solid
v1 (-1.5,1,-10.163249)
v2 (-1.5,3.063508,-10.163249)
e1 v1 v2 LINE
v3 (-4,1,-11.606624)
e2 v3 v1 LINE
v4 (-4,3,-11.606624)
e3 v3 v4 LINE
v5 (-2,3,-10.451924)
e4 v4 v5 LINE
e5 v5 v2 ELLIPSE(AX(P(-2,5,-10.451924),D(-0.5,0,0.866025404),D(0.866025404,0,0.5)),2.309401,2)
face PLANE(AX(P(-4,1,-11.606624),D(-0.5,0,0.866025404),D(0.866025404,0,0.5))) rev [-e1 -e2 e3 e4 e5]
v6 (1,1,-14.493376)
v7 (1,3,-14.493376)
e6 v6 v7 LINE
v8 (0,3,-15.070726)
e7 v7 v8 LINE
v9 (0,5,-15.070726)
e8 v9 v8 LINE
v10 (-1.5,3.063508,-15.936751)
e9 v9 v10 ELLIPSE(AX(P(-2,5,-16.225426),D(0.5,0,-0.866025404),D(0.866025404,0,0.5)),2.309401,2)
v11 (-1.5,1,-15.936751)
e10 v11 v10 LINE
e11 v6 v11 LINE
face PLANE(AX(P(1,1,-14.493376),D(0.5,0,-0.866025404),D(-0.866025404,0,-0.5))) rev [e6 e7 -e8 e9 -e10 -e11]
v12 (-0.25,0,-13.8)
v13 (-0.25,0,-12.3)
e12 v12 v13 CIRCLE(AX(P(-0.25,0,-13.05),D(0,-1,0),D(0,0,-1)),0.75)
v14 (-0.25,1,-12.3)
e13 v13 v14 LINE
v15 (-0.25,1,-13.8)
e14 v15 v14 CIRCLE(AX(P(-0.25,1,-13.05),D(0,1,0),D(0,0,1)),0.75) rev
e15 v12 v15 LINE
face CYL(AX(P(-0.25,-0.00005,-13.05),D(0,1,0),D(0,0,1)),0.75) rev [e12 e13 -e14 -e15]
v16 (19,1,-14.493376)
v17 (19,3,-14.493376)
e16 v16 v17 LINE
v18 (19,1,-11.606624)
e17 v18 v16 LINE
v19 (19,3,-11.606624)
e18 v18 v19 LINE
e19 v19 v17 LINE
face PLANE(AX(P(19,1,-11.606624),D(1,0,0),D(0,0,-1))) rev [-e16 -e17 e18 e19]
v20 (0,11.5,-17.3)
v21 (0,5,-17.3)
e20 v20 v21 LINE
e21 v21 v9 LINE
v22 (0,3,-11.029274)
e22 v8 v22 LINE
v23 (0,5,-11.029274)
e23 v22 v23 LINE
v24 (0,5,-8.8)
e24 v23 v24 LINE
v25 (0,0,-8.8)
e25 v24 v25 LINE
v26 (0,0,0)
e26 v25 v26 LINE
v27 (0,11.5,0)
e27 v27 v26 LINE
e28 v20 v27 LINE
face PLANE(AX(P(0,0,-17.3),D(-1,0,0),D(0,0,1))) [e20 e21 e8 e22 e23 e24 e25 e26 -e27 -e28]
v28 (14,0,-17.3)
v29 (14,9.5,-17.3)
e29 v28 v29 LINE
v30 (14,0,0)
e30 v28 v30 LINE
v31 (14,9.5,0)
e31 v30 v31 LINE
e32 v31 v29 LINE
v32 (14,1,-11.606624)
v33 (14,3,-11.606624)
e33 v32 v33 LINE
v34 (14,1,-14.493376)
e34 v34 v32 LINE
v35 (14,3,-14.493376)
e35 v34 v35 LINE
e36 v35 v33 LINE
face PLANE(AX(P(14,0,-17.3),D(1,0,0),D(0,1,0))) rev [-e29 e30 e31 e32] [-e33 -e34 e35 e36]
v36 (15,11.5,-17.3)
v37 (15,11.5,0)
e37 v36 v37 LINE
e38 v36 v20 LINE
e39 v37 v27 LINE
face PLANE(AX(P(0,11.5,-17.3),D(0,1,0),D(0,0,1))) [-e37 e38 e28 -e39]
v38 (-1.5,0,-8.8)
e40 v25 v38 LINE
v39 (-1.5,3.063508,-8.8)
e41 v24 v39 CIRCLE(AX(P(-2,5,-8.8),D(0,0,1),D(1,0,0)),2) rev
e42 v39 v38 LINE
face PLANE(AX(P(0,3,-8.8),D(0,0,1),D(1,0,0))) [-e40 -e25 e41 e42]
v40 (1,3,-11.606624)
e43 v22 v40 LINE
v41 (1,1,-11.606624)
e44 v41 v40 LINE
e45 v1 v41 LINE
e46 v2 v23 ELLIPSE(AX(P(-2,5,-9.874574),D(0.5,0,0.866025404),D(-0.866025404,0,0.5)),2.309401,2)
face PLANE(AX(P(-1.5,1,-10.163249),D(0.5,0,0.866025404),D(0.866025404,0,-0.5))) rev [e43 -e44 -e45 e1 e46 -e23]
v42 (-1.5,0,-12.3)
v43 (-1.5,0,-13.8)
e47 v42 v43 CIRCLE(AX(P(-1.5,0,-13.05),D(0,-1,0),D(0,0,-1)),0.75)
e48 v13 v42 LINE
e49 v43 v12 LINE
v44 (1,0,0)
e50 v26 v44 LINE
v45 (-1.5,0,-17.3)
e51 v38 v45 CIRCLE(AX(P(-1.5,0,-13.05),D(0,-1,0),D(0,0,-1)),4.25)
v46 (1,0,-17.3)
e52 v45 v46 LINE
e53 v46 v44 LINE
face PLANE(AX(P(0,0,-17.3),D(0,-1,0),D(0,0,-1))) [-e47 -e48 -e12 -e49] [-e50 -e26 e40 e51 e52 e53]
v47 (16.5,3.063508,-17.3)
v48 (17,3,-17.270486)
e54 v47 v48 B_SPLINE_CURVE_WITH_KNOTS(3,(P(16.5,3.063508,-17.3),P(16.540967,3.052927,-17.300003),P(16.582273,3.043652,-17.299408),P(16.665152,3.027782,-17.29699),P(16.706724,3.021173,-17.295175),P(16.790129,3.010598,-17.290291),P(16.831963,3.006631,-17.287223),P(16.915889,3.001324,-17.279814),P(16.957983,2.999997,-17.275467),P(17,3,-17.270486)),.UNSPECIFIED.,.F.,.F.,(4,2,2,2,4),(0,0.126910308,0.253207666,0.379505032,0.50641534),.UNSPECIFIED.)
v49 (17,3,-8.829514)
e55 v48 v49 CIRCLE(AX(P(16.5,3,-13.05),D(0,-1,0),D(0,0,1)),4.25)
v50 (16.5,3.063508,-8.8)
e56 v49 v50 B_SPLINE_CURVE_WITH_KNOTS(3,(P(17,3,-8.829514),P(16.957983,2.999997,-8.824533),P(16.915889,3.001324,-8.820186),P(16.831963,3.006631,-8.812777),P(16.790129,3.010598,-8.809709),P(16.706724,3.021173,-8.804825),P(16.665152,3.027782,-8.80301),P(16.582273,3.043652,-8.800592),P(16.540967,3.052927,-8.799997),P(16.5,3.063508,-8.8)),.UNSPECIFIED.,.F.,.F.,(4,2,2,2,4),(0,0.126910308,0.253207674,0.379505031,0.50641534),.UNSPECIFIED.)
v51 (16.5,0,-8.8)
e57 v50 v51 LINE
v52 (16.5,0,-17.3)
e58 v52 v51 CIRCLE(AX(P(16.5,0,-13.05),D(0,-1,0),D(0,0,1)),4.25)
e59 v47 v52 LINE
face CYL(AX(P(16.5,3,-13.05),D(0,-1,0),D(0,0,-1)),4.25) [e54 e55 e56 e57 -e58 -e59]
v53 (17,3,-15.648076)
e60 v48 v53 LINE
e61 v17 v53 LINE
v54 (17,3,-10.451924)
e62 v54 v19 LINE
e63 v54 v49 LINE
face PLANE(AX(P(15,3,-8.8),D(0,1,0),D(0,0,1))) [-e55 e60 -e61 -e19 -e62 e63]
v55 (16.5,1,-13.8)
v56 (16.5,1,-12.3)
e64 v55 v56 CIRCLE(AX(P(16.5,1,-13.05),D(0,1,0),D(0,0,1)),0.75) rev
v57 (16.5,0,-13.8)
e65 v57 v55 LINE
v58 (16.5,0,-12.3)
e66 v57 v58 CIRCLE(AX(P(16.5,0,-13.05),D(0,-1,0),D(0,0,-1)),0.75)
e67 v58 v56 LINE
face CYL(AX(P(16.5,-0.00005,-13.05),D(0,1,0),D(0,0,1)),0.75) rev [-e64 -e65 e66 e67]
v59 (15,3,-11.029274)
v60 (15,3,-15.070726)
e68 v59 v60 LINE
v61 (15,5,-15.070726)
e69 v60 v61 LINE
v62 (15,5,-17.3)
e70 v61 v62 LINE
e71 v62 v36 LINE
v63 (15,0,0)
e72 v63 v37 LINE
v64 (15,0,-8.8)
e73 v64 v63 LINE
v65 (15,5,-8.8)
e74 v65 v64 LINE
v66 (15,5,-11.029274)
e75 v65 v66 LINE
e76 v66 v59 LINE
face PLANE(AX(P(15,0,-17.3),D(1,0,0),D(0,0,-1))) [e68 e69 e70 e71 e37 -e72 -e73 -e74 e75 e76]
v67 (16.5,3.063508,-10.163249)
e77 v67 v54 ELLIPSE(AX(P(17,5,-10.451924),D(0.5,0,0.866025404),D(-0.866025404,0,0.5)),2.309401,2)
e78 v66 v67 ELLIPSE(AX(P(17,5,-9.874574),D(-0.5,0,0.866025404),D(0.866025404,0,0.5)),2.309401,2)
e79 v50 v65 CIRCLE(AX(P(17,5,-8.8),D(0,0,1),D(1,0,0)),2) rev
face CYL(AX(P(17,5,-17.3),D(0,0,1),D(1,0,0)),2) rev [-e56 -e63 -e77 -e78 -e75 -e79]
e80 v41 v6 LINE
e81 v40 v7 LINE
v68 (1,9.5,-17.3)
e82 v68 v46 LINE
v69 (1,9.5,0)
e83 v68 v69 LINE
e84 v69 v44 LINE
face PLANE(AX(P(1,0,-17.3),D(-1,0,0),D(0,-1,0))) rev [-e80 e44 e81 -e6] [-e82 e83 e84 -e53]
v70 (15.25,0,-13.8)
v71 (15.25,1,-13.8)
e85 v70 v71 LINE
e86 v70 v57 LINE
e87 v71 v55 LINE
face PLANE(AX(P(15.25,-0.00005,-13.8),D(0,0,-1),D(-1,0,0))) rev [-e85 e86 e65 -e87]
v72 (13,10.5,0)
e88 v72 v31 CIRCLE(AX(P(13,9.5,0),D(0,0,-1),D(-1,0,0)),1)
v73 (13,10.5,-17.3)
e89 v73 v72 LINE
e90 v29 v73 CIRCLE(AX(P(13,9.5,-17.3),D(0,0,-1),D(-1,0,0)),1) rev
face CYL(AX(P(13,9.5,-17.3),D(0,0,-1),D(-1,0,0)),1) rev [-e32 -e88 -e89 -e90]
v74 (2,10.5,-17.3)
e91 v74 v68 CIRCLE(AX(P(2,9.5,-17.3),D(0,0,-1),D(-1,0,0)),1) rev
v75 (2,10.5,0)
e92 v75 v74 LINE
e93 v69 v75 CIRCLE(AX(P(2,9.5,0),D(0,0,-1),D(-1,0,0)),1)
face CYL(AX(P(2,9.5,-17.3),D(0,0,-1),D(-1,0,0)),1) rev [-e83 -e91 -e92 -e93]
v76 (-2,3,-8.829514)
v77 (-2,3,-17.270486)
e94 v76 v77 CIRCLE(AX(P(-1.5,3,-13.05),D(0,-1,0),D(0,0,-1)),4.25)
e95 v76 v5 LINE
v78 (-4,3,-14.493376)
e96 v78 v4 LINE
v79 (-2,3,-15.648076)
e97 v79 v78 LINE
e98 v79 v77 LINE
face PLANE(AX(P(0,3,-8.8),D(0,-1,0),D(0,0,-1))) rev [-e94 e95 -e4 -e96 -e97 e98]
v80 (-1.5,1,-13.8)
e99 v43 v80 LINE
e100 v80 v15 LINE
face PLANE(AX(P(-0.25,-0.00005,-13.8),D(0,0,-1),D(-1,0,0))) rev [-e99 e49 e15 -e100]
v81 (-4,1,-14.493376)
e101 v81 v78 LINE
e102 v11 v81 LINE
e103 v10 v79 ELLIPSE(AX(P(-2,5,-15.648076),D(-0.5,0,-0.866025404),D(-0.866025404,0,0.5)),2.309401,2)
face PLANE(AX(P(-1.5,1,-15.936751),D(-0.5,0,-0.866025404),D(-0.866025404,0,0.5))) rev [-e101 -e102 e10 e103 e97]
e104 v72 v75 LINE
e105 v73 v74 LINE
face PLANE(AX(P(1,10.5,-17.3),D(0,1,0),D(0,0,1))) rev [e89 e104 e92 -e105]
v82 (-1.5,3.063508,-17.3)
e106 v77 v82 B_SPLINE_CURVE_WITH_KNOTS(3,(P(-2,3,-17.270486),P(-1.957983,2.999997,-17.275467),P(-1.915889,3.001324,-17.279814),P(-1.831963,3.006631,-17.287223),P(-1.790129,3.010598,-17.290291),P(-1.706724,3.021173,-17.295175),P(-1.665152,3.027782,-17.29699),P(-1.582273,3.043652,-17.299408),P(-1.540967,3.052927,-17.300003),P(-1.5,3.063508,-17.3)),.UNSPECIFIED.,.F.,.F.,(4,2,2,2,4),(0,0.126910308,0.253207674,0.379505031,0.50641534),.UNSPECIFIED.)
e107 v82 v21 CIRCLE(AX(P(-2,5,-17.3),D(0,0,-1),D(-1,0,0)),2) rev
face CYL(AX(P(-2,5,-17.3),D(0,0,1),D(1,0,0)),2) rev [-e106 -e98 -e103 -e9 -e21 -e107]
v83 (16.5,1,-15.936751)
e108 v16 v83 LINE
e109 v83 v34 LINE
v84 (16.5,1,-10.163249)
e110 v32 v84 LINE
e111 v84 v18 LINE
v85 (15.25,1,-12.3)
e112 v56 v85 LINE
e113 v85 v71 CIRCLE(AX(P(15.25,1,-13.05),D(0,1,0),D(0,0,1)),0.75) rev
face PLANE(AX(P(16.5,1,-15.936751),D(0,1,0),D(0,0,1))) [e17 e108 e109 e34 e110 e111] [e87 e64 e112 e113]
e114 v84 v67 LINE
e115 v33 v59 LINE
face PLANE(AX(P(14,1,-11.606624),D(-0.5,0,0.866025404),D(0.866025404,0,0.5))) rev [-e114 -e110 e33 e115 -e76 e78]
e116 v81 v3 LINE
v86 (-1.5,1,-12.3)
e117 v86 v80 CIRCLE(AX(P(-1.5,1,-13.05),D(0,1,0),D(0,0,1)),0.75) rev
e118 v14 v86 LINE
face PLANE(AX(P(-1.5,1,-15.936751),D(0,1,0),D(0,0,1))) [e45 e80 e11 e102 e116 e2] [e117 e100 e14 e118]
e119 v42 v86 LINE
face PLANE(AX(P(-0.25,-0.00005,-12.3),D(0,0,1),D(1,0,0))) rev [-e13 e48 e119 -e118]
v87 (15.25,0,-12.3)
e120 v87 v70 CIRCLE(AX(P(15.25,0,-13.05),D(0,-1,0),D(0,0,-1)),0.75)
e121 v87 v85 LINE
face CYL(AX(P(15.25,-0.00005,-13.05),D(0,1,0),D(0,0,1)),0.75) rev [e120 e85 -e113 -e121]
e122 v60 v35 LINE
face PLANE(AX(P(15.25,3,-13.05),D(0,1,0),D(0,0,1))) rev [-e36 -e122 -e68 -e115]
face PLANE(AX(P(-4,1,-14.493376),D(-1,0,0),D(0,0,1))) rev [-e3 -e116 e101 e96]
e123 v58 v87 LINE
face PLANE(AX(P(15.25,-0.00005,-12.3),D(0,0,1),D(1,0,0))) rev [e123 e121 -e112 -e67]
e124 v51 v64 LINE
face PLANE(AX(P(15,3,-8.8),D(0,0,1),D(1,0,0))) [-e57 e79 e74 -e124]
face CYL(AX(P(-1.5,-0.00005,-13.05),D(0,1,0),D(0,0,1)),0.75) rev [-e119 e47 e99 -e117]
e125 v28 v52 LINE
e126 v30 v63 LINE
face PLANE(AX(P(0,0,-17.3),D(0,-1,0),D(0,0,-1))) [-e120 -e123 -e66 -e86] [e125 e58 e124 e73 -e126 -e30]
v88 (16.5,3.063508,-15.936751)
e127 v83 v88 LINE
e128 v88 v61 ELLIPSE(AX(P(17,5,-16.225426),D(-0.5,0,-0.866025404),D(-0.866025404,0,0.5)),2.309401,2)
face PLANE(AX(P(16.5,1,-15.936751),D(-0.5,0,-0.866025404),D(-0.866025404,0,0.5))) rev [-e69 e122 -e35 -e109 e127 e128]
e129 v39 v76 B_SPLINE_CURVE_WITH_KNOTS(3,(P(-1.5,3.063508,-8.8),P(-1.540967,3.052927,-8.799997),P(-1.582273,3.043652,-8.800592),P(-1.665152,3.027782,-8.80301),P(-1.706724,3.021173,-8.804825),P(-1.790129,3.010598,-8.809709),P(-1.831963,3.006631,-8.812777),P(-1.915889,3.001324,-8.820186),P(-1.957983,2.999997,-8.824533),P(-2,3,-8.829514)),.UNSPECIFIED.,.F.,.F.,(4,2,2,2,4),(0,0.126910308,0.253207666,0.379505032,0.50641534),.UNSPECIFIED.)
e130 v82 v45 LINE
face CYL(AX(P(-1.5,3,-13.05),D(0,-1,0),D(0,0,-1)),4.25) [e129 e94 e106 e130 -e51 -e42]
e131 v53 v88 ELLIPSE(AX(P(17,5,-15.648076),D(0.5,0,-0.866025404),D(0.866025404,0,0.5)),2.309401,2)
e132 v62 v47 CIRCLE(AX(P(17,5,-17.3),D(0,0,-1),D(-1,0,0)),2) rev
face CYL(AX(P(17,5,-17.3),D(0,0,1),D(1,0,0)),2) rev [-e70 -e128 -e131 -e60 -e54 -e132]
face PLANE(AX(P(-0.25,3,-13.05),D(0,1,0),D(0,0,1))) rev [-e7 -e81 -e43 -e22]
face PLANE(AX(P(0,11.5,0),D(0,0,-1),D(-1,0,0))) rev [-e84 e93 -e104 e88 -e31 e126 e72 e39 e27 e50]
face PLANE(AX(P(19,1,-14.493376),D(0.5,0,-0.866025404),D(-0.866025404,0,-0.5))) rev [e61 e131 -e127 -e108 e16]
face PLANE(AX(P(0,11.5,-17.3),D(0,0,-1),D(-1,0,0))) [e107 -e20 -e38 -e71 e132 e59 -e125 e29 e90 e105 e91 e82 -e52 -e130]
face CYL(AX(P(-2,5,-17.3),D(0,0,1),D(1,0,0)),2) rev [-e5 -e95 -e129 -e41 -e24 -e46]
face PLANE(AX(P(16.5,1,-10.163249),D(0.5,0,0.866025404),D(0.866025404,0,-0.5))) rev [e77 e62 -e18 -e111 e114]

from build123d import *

# Parameters (mm, degrees)
SKETCH1_W           = 15
SKETCH1_H           = 11.5
BOSS_EXTRUDE1_DEPTH = 17.3
SKETCH2_W           = 13
SKETCH2_H           = 10.5
CUT_EXTRUDE1_DEPTH  = 26.62303651
FILLET1_R           = 1
SKETCH7_W           = 1.5
SKETCH7_H           = 8.5
BOSS_EXTRUDE4_DEPTH = 3
BOSS_EXTRUDE5_DEPTH = 3
BOSS_EXTRUDE6_DEPTH = 3
CUT_EXTRUDE4_DEPTH  = 29.32141416
CUT_EXTRUDE5_DEPTH  = 2
FILLET6_START       = -16.47329
FILLET6_DEPTH       = 0.536538654
FILLET6_START_2     = -10.163248654
FILLET6_2_DEPTH     = 0.536538654
FILLET6_START_3     = -11.029274158
FILLET6_3_DEPTH     = 2.229274158
FILLET6_START_4     = -17.3
FILLET6_4_DEPTH     = 2.229274058
FILLET6_START_5     = 3
FILLET6_5_DEPTH     = 3


with BuildPart() as part:
    # Sketch1 → Boss-Extrude1 (new body)
    with BuildSketch(Plane.XY):
        with Locations((7.5, 5.75)):
            Rectangle(SKETCH1_W, SKETCH1_H)
    extrude(amount=-BOSS_EXTRUDE1_DEPTH)

    # Sketch2 → Cut-Extrude1 (cut, through all)
    with BuildSketch(Plane.XY):
        with Locations((7.5, 5.25)):
            Rectangle(SKETCH2_W, SKETCH2_H)
    extrude(amount=-CUT_EXTRUDE1_DEPTH, mode=Mode.SUBTRACT)

    # Fillet1
    fillet1_edges = [part.edges().sort_by_distance(p)[0] for p in [
        (1, 10.5, -8.65),
        (14, 10.5, -8.65),
    ]]
    fillet(fillet1_edges, radius=FILLET1_R)

    # Sketch7 → Boss-Extrude4 (add)
    with BuildSketch(Plane.XZ):
        with Locations((-0.75, -13.05)):
            Rectangle(SKETCH7_W, SKETCH7_H)
        with Locations((15.75, -13.05)):
            Rectangle(SKETCH7_W, SKETCH7_H)
    extrude(amount=-BOSS_EXTRUDE4_DEPTH)

    # Sketch11 → Boss-Extrude5 (add)
    with BuildSketch(Plane.XZ):
        with BuildLine():
            Line((-1.5, -8.8), (-1.5, -17.3))
            ThreePointArc((-1.5, -17.3), (-5.75, -13.05), (-1.5, -8.8))
        make_face()
    extrude(amount=-BOSS_EXTRUDE5_DEPTH)

    # Sketch12 → Boss-Extrude6 (add)
    with BuildSketch(Plane.XZ):
        with BuildLine():
            Line((14, 0), (14, -17.3))
            Line((14, -17.3), (16.5, -17.3))
            ThreePointArc((16.5, -17.3), (20.75, -13.05), (16.5, -8.8))
            Line((16.5, -8.8), (15, -8.8))
            Line((15, -8.8), (15, 0))
            Line((15, 0), (14, 0))
        make_face()
    extrude(amount=-BOSS_EXTRUDE6_DEPTH)

    # Sketch13 → Cut-Extrude4 (cut, through all)
    with BuildSketch(Plane(origin=(0, 3, 0), x_dir=(1, 0, 0), z_dir=(0, 1, 0))):
        with BuildLine():
            Line((-0.25, 12.3), (-1.5, 12.3))
            ThreePointArc((-1.5, 12.3), (-2.25, 13.05), (-1.5, 13.8))
            Line((-1.5, 13.8), (-0.25, 13.8))
            ThreePointArc((-0.25, 13.8), (0.5, 13.05), (-0.25, 12.3))
        make_face()
        with BuildLine():
            Line((15.25, 13.8), (16.5, 13.8))
            ThreePointArc((16.5, 13.8), (17.25, 13.05), (16.5, 12.3))
            Line((16.5, 12.3), (15.25, 12.3))
            ThreePointArc((15.25, 12.3), (14.5, 13.05), (15.25, 13.8))
        make_face()
    extrude(amount=-CUT_EXTRUDE4_DEPTH, mode=Mode.SUBTRACT)

    # Sketch14 → Cut-Extrude5 (cut)
    with BuildSketch(Plane(origin=(0, 3, 0), x_dir=(1, 0, 0), z_dir=(0, 1, 0))):
        Polygon((-1.5, 15.936751346), (-4, 14.493375673), (-4, 11.606624327), (-1.5, 10.163248654), (1, 11.606624327), (1, 14.493375673), align=None)
        Polygon((16.5, 15.936751346), (14, 14.493375673), (14, 11.606624327), (16.5, 10.163248654), (19, 11.606624327), (19, 14.493375673), align=None)
    extrude(amount=-CUT_EXTRUDE5_DEPTH, mode=Mode.SUBTRACT)

    # Fillet6: read off the stored shape, not the designer's step
    # Fillet6 outline → Fillet6 (add)
    with BuildSketch(Plane.XY.offset(FILLET6_START)):
        with BuildLine():
            ThreePointArc((17, 3), (15.585786438, 3.585786438), (15, 5))
            Line((15, 5), (15, 3))
            Line((15, 3), (17, 3))
        make_face()
        with BuildLine():
            ThreePointArc((0, 5), (-0.585786438, 3.585786438), (-2, 3))
            Line((-2, 3), (0, 3))
            Line((0, 3), (0, 5))
        make_face()
    extrude(amount=FILLET6_DEPTH)

    # Fillet6 2 outline → Fillet6 2 (add)
    with BuildSketch(Plane.XY.offset(FILLET6_START_2)):
        with BuildLine():
            ThreePointArc((17, 3), (15.585786438, 3.585786438), (15, 5))
            Line((15, 5), (15, 3))
            Line((15, 3), (17, 3))
        make_face()
        with BuildLine():
            ThreePointArc((0, 5), (-0.585786438, 3.585786438), (-2, 3))
            Line((-2, 3), (0, 3))
            Line((0, 3), (0, 5))
        make_face()
    extrude(amount=FILLET6_2_DEPTH)

    # Fillet6 3 outline → Fillet6 3 (add)
    with BuildSketch(Plane.XY.offset(FILLET6_START_3)):
        with BuildLine():
            ThreePointArc((17, 3), (15.585786438, 3.585786438), (15, 5))
            Line((15, 5), (15, 3))
            Line((15, 3), (17, 3))
        make_face()
        with BuildLine():
            ThreePointArc((0, 5), (-0.585786438, 3.585786438), (-2, 3))
            Line((-2, 3), (0, 3))
            Line((0, 3), (0, 5))
        make_face()
    extrude(amount=FILLET6_3_DEPTH)

    # Fillet6 4 outline → Fillet6 4 (add)
    with BuildSketch(Plane.XY.offset(FILLET6_START_4)):
        with BuildLine():
            ThreePointArc((17, 3), (15.585786438, 3.585786438), (15, 5))
            Line((15, 5), (15, 3))
            Line((15, 3), (17, 3))
        make_face()
        with BuildLine():
            ThreePointArc((0, 5), (-0.585786438, 3.585786438), (-2, 3))
            Line((-2, 3), (0, 3))
            Line((0, 3), (0, 5))
        make_face()
    extrude(amount=FILLET6_4_DEPTH)

    # Fillet6 5 outline → Fillet6 5 (cut)
    with BuildSketch(Plane(origin=(0, 0, 0), x_dir=(1, 0, 0), z_dir=(0, 1, 0)).offset(FILLET6_START_5)):
        Polygon((16.5, 15.936751346), (15, 15.070725942), (17, 15.070725942), (17, 15.648076211), align=None)
        with BuildLine():
            ThreePointArc((17, 8.829514246), (16.750435167, 8.807384978), (16.5, 8.8))
            Line((16.5, 8.8), (17, 8.8))
            Line((17, 8.8), (17, 8.829514246))
        make_face()
        with BuildLine():
            Line((17, 17.3), (16.5, 17.3))
            ThreePointArc((16.5, 17.3), (16.750435167, 17.292615022), (17, 17.270485754))
            Line((17, 17.270485754), (17, 17.3))
        make_face()
        with BuildLine():
            Line((-2, 17.3), (-2, 17.270485754))
            ThreePointArc((-2, 17.270485754), (-1.750435167, 17.292615022), (-1.5, 17.3))
            Line((-1.5, 17.3), (-2, 17.3))
        make_face()
        Polygon((-1.5, 15.936751346), (-2, 15.648076211), (-2, 15.070725942), (0, 15.070725942), align=None)
        Polygon((-2, 11.029274158), (-2, 10.451923789), (-1.5, 10.163248654), (0, 11.029274058), align=None)
        with BuildLine():
            ThreePointArc((-1.5, 8.8), (-1.750435167, 8.807384978), (-2, 8.829514246))
            Line((-2, 8.829514246), (-2, 8.8))
            Line((-2, 8.8), (-1.5, 8.8))
        make_face()
        Polygon((17, 11.029274158), (15, 11.029274158), (16.5, 10.163248654), (17, 10.451923789), align=None)
    extrude(amount=FILLET6_5_DEPTH, mode=Mode.SUBTRACT)


solid = part.part
